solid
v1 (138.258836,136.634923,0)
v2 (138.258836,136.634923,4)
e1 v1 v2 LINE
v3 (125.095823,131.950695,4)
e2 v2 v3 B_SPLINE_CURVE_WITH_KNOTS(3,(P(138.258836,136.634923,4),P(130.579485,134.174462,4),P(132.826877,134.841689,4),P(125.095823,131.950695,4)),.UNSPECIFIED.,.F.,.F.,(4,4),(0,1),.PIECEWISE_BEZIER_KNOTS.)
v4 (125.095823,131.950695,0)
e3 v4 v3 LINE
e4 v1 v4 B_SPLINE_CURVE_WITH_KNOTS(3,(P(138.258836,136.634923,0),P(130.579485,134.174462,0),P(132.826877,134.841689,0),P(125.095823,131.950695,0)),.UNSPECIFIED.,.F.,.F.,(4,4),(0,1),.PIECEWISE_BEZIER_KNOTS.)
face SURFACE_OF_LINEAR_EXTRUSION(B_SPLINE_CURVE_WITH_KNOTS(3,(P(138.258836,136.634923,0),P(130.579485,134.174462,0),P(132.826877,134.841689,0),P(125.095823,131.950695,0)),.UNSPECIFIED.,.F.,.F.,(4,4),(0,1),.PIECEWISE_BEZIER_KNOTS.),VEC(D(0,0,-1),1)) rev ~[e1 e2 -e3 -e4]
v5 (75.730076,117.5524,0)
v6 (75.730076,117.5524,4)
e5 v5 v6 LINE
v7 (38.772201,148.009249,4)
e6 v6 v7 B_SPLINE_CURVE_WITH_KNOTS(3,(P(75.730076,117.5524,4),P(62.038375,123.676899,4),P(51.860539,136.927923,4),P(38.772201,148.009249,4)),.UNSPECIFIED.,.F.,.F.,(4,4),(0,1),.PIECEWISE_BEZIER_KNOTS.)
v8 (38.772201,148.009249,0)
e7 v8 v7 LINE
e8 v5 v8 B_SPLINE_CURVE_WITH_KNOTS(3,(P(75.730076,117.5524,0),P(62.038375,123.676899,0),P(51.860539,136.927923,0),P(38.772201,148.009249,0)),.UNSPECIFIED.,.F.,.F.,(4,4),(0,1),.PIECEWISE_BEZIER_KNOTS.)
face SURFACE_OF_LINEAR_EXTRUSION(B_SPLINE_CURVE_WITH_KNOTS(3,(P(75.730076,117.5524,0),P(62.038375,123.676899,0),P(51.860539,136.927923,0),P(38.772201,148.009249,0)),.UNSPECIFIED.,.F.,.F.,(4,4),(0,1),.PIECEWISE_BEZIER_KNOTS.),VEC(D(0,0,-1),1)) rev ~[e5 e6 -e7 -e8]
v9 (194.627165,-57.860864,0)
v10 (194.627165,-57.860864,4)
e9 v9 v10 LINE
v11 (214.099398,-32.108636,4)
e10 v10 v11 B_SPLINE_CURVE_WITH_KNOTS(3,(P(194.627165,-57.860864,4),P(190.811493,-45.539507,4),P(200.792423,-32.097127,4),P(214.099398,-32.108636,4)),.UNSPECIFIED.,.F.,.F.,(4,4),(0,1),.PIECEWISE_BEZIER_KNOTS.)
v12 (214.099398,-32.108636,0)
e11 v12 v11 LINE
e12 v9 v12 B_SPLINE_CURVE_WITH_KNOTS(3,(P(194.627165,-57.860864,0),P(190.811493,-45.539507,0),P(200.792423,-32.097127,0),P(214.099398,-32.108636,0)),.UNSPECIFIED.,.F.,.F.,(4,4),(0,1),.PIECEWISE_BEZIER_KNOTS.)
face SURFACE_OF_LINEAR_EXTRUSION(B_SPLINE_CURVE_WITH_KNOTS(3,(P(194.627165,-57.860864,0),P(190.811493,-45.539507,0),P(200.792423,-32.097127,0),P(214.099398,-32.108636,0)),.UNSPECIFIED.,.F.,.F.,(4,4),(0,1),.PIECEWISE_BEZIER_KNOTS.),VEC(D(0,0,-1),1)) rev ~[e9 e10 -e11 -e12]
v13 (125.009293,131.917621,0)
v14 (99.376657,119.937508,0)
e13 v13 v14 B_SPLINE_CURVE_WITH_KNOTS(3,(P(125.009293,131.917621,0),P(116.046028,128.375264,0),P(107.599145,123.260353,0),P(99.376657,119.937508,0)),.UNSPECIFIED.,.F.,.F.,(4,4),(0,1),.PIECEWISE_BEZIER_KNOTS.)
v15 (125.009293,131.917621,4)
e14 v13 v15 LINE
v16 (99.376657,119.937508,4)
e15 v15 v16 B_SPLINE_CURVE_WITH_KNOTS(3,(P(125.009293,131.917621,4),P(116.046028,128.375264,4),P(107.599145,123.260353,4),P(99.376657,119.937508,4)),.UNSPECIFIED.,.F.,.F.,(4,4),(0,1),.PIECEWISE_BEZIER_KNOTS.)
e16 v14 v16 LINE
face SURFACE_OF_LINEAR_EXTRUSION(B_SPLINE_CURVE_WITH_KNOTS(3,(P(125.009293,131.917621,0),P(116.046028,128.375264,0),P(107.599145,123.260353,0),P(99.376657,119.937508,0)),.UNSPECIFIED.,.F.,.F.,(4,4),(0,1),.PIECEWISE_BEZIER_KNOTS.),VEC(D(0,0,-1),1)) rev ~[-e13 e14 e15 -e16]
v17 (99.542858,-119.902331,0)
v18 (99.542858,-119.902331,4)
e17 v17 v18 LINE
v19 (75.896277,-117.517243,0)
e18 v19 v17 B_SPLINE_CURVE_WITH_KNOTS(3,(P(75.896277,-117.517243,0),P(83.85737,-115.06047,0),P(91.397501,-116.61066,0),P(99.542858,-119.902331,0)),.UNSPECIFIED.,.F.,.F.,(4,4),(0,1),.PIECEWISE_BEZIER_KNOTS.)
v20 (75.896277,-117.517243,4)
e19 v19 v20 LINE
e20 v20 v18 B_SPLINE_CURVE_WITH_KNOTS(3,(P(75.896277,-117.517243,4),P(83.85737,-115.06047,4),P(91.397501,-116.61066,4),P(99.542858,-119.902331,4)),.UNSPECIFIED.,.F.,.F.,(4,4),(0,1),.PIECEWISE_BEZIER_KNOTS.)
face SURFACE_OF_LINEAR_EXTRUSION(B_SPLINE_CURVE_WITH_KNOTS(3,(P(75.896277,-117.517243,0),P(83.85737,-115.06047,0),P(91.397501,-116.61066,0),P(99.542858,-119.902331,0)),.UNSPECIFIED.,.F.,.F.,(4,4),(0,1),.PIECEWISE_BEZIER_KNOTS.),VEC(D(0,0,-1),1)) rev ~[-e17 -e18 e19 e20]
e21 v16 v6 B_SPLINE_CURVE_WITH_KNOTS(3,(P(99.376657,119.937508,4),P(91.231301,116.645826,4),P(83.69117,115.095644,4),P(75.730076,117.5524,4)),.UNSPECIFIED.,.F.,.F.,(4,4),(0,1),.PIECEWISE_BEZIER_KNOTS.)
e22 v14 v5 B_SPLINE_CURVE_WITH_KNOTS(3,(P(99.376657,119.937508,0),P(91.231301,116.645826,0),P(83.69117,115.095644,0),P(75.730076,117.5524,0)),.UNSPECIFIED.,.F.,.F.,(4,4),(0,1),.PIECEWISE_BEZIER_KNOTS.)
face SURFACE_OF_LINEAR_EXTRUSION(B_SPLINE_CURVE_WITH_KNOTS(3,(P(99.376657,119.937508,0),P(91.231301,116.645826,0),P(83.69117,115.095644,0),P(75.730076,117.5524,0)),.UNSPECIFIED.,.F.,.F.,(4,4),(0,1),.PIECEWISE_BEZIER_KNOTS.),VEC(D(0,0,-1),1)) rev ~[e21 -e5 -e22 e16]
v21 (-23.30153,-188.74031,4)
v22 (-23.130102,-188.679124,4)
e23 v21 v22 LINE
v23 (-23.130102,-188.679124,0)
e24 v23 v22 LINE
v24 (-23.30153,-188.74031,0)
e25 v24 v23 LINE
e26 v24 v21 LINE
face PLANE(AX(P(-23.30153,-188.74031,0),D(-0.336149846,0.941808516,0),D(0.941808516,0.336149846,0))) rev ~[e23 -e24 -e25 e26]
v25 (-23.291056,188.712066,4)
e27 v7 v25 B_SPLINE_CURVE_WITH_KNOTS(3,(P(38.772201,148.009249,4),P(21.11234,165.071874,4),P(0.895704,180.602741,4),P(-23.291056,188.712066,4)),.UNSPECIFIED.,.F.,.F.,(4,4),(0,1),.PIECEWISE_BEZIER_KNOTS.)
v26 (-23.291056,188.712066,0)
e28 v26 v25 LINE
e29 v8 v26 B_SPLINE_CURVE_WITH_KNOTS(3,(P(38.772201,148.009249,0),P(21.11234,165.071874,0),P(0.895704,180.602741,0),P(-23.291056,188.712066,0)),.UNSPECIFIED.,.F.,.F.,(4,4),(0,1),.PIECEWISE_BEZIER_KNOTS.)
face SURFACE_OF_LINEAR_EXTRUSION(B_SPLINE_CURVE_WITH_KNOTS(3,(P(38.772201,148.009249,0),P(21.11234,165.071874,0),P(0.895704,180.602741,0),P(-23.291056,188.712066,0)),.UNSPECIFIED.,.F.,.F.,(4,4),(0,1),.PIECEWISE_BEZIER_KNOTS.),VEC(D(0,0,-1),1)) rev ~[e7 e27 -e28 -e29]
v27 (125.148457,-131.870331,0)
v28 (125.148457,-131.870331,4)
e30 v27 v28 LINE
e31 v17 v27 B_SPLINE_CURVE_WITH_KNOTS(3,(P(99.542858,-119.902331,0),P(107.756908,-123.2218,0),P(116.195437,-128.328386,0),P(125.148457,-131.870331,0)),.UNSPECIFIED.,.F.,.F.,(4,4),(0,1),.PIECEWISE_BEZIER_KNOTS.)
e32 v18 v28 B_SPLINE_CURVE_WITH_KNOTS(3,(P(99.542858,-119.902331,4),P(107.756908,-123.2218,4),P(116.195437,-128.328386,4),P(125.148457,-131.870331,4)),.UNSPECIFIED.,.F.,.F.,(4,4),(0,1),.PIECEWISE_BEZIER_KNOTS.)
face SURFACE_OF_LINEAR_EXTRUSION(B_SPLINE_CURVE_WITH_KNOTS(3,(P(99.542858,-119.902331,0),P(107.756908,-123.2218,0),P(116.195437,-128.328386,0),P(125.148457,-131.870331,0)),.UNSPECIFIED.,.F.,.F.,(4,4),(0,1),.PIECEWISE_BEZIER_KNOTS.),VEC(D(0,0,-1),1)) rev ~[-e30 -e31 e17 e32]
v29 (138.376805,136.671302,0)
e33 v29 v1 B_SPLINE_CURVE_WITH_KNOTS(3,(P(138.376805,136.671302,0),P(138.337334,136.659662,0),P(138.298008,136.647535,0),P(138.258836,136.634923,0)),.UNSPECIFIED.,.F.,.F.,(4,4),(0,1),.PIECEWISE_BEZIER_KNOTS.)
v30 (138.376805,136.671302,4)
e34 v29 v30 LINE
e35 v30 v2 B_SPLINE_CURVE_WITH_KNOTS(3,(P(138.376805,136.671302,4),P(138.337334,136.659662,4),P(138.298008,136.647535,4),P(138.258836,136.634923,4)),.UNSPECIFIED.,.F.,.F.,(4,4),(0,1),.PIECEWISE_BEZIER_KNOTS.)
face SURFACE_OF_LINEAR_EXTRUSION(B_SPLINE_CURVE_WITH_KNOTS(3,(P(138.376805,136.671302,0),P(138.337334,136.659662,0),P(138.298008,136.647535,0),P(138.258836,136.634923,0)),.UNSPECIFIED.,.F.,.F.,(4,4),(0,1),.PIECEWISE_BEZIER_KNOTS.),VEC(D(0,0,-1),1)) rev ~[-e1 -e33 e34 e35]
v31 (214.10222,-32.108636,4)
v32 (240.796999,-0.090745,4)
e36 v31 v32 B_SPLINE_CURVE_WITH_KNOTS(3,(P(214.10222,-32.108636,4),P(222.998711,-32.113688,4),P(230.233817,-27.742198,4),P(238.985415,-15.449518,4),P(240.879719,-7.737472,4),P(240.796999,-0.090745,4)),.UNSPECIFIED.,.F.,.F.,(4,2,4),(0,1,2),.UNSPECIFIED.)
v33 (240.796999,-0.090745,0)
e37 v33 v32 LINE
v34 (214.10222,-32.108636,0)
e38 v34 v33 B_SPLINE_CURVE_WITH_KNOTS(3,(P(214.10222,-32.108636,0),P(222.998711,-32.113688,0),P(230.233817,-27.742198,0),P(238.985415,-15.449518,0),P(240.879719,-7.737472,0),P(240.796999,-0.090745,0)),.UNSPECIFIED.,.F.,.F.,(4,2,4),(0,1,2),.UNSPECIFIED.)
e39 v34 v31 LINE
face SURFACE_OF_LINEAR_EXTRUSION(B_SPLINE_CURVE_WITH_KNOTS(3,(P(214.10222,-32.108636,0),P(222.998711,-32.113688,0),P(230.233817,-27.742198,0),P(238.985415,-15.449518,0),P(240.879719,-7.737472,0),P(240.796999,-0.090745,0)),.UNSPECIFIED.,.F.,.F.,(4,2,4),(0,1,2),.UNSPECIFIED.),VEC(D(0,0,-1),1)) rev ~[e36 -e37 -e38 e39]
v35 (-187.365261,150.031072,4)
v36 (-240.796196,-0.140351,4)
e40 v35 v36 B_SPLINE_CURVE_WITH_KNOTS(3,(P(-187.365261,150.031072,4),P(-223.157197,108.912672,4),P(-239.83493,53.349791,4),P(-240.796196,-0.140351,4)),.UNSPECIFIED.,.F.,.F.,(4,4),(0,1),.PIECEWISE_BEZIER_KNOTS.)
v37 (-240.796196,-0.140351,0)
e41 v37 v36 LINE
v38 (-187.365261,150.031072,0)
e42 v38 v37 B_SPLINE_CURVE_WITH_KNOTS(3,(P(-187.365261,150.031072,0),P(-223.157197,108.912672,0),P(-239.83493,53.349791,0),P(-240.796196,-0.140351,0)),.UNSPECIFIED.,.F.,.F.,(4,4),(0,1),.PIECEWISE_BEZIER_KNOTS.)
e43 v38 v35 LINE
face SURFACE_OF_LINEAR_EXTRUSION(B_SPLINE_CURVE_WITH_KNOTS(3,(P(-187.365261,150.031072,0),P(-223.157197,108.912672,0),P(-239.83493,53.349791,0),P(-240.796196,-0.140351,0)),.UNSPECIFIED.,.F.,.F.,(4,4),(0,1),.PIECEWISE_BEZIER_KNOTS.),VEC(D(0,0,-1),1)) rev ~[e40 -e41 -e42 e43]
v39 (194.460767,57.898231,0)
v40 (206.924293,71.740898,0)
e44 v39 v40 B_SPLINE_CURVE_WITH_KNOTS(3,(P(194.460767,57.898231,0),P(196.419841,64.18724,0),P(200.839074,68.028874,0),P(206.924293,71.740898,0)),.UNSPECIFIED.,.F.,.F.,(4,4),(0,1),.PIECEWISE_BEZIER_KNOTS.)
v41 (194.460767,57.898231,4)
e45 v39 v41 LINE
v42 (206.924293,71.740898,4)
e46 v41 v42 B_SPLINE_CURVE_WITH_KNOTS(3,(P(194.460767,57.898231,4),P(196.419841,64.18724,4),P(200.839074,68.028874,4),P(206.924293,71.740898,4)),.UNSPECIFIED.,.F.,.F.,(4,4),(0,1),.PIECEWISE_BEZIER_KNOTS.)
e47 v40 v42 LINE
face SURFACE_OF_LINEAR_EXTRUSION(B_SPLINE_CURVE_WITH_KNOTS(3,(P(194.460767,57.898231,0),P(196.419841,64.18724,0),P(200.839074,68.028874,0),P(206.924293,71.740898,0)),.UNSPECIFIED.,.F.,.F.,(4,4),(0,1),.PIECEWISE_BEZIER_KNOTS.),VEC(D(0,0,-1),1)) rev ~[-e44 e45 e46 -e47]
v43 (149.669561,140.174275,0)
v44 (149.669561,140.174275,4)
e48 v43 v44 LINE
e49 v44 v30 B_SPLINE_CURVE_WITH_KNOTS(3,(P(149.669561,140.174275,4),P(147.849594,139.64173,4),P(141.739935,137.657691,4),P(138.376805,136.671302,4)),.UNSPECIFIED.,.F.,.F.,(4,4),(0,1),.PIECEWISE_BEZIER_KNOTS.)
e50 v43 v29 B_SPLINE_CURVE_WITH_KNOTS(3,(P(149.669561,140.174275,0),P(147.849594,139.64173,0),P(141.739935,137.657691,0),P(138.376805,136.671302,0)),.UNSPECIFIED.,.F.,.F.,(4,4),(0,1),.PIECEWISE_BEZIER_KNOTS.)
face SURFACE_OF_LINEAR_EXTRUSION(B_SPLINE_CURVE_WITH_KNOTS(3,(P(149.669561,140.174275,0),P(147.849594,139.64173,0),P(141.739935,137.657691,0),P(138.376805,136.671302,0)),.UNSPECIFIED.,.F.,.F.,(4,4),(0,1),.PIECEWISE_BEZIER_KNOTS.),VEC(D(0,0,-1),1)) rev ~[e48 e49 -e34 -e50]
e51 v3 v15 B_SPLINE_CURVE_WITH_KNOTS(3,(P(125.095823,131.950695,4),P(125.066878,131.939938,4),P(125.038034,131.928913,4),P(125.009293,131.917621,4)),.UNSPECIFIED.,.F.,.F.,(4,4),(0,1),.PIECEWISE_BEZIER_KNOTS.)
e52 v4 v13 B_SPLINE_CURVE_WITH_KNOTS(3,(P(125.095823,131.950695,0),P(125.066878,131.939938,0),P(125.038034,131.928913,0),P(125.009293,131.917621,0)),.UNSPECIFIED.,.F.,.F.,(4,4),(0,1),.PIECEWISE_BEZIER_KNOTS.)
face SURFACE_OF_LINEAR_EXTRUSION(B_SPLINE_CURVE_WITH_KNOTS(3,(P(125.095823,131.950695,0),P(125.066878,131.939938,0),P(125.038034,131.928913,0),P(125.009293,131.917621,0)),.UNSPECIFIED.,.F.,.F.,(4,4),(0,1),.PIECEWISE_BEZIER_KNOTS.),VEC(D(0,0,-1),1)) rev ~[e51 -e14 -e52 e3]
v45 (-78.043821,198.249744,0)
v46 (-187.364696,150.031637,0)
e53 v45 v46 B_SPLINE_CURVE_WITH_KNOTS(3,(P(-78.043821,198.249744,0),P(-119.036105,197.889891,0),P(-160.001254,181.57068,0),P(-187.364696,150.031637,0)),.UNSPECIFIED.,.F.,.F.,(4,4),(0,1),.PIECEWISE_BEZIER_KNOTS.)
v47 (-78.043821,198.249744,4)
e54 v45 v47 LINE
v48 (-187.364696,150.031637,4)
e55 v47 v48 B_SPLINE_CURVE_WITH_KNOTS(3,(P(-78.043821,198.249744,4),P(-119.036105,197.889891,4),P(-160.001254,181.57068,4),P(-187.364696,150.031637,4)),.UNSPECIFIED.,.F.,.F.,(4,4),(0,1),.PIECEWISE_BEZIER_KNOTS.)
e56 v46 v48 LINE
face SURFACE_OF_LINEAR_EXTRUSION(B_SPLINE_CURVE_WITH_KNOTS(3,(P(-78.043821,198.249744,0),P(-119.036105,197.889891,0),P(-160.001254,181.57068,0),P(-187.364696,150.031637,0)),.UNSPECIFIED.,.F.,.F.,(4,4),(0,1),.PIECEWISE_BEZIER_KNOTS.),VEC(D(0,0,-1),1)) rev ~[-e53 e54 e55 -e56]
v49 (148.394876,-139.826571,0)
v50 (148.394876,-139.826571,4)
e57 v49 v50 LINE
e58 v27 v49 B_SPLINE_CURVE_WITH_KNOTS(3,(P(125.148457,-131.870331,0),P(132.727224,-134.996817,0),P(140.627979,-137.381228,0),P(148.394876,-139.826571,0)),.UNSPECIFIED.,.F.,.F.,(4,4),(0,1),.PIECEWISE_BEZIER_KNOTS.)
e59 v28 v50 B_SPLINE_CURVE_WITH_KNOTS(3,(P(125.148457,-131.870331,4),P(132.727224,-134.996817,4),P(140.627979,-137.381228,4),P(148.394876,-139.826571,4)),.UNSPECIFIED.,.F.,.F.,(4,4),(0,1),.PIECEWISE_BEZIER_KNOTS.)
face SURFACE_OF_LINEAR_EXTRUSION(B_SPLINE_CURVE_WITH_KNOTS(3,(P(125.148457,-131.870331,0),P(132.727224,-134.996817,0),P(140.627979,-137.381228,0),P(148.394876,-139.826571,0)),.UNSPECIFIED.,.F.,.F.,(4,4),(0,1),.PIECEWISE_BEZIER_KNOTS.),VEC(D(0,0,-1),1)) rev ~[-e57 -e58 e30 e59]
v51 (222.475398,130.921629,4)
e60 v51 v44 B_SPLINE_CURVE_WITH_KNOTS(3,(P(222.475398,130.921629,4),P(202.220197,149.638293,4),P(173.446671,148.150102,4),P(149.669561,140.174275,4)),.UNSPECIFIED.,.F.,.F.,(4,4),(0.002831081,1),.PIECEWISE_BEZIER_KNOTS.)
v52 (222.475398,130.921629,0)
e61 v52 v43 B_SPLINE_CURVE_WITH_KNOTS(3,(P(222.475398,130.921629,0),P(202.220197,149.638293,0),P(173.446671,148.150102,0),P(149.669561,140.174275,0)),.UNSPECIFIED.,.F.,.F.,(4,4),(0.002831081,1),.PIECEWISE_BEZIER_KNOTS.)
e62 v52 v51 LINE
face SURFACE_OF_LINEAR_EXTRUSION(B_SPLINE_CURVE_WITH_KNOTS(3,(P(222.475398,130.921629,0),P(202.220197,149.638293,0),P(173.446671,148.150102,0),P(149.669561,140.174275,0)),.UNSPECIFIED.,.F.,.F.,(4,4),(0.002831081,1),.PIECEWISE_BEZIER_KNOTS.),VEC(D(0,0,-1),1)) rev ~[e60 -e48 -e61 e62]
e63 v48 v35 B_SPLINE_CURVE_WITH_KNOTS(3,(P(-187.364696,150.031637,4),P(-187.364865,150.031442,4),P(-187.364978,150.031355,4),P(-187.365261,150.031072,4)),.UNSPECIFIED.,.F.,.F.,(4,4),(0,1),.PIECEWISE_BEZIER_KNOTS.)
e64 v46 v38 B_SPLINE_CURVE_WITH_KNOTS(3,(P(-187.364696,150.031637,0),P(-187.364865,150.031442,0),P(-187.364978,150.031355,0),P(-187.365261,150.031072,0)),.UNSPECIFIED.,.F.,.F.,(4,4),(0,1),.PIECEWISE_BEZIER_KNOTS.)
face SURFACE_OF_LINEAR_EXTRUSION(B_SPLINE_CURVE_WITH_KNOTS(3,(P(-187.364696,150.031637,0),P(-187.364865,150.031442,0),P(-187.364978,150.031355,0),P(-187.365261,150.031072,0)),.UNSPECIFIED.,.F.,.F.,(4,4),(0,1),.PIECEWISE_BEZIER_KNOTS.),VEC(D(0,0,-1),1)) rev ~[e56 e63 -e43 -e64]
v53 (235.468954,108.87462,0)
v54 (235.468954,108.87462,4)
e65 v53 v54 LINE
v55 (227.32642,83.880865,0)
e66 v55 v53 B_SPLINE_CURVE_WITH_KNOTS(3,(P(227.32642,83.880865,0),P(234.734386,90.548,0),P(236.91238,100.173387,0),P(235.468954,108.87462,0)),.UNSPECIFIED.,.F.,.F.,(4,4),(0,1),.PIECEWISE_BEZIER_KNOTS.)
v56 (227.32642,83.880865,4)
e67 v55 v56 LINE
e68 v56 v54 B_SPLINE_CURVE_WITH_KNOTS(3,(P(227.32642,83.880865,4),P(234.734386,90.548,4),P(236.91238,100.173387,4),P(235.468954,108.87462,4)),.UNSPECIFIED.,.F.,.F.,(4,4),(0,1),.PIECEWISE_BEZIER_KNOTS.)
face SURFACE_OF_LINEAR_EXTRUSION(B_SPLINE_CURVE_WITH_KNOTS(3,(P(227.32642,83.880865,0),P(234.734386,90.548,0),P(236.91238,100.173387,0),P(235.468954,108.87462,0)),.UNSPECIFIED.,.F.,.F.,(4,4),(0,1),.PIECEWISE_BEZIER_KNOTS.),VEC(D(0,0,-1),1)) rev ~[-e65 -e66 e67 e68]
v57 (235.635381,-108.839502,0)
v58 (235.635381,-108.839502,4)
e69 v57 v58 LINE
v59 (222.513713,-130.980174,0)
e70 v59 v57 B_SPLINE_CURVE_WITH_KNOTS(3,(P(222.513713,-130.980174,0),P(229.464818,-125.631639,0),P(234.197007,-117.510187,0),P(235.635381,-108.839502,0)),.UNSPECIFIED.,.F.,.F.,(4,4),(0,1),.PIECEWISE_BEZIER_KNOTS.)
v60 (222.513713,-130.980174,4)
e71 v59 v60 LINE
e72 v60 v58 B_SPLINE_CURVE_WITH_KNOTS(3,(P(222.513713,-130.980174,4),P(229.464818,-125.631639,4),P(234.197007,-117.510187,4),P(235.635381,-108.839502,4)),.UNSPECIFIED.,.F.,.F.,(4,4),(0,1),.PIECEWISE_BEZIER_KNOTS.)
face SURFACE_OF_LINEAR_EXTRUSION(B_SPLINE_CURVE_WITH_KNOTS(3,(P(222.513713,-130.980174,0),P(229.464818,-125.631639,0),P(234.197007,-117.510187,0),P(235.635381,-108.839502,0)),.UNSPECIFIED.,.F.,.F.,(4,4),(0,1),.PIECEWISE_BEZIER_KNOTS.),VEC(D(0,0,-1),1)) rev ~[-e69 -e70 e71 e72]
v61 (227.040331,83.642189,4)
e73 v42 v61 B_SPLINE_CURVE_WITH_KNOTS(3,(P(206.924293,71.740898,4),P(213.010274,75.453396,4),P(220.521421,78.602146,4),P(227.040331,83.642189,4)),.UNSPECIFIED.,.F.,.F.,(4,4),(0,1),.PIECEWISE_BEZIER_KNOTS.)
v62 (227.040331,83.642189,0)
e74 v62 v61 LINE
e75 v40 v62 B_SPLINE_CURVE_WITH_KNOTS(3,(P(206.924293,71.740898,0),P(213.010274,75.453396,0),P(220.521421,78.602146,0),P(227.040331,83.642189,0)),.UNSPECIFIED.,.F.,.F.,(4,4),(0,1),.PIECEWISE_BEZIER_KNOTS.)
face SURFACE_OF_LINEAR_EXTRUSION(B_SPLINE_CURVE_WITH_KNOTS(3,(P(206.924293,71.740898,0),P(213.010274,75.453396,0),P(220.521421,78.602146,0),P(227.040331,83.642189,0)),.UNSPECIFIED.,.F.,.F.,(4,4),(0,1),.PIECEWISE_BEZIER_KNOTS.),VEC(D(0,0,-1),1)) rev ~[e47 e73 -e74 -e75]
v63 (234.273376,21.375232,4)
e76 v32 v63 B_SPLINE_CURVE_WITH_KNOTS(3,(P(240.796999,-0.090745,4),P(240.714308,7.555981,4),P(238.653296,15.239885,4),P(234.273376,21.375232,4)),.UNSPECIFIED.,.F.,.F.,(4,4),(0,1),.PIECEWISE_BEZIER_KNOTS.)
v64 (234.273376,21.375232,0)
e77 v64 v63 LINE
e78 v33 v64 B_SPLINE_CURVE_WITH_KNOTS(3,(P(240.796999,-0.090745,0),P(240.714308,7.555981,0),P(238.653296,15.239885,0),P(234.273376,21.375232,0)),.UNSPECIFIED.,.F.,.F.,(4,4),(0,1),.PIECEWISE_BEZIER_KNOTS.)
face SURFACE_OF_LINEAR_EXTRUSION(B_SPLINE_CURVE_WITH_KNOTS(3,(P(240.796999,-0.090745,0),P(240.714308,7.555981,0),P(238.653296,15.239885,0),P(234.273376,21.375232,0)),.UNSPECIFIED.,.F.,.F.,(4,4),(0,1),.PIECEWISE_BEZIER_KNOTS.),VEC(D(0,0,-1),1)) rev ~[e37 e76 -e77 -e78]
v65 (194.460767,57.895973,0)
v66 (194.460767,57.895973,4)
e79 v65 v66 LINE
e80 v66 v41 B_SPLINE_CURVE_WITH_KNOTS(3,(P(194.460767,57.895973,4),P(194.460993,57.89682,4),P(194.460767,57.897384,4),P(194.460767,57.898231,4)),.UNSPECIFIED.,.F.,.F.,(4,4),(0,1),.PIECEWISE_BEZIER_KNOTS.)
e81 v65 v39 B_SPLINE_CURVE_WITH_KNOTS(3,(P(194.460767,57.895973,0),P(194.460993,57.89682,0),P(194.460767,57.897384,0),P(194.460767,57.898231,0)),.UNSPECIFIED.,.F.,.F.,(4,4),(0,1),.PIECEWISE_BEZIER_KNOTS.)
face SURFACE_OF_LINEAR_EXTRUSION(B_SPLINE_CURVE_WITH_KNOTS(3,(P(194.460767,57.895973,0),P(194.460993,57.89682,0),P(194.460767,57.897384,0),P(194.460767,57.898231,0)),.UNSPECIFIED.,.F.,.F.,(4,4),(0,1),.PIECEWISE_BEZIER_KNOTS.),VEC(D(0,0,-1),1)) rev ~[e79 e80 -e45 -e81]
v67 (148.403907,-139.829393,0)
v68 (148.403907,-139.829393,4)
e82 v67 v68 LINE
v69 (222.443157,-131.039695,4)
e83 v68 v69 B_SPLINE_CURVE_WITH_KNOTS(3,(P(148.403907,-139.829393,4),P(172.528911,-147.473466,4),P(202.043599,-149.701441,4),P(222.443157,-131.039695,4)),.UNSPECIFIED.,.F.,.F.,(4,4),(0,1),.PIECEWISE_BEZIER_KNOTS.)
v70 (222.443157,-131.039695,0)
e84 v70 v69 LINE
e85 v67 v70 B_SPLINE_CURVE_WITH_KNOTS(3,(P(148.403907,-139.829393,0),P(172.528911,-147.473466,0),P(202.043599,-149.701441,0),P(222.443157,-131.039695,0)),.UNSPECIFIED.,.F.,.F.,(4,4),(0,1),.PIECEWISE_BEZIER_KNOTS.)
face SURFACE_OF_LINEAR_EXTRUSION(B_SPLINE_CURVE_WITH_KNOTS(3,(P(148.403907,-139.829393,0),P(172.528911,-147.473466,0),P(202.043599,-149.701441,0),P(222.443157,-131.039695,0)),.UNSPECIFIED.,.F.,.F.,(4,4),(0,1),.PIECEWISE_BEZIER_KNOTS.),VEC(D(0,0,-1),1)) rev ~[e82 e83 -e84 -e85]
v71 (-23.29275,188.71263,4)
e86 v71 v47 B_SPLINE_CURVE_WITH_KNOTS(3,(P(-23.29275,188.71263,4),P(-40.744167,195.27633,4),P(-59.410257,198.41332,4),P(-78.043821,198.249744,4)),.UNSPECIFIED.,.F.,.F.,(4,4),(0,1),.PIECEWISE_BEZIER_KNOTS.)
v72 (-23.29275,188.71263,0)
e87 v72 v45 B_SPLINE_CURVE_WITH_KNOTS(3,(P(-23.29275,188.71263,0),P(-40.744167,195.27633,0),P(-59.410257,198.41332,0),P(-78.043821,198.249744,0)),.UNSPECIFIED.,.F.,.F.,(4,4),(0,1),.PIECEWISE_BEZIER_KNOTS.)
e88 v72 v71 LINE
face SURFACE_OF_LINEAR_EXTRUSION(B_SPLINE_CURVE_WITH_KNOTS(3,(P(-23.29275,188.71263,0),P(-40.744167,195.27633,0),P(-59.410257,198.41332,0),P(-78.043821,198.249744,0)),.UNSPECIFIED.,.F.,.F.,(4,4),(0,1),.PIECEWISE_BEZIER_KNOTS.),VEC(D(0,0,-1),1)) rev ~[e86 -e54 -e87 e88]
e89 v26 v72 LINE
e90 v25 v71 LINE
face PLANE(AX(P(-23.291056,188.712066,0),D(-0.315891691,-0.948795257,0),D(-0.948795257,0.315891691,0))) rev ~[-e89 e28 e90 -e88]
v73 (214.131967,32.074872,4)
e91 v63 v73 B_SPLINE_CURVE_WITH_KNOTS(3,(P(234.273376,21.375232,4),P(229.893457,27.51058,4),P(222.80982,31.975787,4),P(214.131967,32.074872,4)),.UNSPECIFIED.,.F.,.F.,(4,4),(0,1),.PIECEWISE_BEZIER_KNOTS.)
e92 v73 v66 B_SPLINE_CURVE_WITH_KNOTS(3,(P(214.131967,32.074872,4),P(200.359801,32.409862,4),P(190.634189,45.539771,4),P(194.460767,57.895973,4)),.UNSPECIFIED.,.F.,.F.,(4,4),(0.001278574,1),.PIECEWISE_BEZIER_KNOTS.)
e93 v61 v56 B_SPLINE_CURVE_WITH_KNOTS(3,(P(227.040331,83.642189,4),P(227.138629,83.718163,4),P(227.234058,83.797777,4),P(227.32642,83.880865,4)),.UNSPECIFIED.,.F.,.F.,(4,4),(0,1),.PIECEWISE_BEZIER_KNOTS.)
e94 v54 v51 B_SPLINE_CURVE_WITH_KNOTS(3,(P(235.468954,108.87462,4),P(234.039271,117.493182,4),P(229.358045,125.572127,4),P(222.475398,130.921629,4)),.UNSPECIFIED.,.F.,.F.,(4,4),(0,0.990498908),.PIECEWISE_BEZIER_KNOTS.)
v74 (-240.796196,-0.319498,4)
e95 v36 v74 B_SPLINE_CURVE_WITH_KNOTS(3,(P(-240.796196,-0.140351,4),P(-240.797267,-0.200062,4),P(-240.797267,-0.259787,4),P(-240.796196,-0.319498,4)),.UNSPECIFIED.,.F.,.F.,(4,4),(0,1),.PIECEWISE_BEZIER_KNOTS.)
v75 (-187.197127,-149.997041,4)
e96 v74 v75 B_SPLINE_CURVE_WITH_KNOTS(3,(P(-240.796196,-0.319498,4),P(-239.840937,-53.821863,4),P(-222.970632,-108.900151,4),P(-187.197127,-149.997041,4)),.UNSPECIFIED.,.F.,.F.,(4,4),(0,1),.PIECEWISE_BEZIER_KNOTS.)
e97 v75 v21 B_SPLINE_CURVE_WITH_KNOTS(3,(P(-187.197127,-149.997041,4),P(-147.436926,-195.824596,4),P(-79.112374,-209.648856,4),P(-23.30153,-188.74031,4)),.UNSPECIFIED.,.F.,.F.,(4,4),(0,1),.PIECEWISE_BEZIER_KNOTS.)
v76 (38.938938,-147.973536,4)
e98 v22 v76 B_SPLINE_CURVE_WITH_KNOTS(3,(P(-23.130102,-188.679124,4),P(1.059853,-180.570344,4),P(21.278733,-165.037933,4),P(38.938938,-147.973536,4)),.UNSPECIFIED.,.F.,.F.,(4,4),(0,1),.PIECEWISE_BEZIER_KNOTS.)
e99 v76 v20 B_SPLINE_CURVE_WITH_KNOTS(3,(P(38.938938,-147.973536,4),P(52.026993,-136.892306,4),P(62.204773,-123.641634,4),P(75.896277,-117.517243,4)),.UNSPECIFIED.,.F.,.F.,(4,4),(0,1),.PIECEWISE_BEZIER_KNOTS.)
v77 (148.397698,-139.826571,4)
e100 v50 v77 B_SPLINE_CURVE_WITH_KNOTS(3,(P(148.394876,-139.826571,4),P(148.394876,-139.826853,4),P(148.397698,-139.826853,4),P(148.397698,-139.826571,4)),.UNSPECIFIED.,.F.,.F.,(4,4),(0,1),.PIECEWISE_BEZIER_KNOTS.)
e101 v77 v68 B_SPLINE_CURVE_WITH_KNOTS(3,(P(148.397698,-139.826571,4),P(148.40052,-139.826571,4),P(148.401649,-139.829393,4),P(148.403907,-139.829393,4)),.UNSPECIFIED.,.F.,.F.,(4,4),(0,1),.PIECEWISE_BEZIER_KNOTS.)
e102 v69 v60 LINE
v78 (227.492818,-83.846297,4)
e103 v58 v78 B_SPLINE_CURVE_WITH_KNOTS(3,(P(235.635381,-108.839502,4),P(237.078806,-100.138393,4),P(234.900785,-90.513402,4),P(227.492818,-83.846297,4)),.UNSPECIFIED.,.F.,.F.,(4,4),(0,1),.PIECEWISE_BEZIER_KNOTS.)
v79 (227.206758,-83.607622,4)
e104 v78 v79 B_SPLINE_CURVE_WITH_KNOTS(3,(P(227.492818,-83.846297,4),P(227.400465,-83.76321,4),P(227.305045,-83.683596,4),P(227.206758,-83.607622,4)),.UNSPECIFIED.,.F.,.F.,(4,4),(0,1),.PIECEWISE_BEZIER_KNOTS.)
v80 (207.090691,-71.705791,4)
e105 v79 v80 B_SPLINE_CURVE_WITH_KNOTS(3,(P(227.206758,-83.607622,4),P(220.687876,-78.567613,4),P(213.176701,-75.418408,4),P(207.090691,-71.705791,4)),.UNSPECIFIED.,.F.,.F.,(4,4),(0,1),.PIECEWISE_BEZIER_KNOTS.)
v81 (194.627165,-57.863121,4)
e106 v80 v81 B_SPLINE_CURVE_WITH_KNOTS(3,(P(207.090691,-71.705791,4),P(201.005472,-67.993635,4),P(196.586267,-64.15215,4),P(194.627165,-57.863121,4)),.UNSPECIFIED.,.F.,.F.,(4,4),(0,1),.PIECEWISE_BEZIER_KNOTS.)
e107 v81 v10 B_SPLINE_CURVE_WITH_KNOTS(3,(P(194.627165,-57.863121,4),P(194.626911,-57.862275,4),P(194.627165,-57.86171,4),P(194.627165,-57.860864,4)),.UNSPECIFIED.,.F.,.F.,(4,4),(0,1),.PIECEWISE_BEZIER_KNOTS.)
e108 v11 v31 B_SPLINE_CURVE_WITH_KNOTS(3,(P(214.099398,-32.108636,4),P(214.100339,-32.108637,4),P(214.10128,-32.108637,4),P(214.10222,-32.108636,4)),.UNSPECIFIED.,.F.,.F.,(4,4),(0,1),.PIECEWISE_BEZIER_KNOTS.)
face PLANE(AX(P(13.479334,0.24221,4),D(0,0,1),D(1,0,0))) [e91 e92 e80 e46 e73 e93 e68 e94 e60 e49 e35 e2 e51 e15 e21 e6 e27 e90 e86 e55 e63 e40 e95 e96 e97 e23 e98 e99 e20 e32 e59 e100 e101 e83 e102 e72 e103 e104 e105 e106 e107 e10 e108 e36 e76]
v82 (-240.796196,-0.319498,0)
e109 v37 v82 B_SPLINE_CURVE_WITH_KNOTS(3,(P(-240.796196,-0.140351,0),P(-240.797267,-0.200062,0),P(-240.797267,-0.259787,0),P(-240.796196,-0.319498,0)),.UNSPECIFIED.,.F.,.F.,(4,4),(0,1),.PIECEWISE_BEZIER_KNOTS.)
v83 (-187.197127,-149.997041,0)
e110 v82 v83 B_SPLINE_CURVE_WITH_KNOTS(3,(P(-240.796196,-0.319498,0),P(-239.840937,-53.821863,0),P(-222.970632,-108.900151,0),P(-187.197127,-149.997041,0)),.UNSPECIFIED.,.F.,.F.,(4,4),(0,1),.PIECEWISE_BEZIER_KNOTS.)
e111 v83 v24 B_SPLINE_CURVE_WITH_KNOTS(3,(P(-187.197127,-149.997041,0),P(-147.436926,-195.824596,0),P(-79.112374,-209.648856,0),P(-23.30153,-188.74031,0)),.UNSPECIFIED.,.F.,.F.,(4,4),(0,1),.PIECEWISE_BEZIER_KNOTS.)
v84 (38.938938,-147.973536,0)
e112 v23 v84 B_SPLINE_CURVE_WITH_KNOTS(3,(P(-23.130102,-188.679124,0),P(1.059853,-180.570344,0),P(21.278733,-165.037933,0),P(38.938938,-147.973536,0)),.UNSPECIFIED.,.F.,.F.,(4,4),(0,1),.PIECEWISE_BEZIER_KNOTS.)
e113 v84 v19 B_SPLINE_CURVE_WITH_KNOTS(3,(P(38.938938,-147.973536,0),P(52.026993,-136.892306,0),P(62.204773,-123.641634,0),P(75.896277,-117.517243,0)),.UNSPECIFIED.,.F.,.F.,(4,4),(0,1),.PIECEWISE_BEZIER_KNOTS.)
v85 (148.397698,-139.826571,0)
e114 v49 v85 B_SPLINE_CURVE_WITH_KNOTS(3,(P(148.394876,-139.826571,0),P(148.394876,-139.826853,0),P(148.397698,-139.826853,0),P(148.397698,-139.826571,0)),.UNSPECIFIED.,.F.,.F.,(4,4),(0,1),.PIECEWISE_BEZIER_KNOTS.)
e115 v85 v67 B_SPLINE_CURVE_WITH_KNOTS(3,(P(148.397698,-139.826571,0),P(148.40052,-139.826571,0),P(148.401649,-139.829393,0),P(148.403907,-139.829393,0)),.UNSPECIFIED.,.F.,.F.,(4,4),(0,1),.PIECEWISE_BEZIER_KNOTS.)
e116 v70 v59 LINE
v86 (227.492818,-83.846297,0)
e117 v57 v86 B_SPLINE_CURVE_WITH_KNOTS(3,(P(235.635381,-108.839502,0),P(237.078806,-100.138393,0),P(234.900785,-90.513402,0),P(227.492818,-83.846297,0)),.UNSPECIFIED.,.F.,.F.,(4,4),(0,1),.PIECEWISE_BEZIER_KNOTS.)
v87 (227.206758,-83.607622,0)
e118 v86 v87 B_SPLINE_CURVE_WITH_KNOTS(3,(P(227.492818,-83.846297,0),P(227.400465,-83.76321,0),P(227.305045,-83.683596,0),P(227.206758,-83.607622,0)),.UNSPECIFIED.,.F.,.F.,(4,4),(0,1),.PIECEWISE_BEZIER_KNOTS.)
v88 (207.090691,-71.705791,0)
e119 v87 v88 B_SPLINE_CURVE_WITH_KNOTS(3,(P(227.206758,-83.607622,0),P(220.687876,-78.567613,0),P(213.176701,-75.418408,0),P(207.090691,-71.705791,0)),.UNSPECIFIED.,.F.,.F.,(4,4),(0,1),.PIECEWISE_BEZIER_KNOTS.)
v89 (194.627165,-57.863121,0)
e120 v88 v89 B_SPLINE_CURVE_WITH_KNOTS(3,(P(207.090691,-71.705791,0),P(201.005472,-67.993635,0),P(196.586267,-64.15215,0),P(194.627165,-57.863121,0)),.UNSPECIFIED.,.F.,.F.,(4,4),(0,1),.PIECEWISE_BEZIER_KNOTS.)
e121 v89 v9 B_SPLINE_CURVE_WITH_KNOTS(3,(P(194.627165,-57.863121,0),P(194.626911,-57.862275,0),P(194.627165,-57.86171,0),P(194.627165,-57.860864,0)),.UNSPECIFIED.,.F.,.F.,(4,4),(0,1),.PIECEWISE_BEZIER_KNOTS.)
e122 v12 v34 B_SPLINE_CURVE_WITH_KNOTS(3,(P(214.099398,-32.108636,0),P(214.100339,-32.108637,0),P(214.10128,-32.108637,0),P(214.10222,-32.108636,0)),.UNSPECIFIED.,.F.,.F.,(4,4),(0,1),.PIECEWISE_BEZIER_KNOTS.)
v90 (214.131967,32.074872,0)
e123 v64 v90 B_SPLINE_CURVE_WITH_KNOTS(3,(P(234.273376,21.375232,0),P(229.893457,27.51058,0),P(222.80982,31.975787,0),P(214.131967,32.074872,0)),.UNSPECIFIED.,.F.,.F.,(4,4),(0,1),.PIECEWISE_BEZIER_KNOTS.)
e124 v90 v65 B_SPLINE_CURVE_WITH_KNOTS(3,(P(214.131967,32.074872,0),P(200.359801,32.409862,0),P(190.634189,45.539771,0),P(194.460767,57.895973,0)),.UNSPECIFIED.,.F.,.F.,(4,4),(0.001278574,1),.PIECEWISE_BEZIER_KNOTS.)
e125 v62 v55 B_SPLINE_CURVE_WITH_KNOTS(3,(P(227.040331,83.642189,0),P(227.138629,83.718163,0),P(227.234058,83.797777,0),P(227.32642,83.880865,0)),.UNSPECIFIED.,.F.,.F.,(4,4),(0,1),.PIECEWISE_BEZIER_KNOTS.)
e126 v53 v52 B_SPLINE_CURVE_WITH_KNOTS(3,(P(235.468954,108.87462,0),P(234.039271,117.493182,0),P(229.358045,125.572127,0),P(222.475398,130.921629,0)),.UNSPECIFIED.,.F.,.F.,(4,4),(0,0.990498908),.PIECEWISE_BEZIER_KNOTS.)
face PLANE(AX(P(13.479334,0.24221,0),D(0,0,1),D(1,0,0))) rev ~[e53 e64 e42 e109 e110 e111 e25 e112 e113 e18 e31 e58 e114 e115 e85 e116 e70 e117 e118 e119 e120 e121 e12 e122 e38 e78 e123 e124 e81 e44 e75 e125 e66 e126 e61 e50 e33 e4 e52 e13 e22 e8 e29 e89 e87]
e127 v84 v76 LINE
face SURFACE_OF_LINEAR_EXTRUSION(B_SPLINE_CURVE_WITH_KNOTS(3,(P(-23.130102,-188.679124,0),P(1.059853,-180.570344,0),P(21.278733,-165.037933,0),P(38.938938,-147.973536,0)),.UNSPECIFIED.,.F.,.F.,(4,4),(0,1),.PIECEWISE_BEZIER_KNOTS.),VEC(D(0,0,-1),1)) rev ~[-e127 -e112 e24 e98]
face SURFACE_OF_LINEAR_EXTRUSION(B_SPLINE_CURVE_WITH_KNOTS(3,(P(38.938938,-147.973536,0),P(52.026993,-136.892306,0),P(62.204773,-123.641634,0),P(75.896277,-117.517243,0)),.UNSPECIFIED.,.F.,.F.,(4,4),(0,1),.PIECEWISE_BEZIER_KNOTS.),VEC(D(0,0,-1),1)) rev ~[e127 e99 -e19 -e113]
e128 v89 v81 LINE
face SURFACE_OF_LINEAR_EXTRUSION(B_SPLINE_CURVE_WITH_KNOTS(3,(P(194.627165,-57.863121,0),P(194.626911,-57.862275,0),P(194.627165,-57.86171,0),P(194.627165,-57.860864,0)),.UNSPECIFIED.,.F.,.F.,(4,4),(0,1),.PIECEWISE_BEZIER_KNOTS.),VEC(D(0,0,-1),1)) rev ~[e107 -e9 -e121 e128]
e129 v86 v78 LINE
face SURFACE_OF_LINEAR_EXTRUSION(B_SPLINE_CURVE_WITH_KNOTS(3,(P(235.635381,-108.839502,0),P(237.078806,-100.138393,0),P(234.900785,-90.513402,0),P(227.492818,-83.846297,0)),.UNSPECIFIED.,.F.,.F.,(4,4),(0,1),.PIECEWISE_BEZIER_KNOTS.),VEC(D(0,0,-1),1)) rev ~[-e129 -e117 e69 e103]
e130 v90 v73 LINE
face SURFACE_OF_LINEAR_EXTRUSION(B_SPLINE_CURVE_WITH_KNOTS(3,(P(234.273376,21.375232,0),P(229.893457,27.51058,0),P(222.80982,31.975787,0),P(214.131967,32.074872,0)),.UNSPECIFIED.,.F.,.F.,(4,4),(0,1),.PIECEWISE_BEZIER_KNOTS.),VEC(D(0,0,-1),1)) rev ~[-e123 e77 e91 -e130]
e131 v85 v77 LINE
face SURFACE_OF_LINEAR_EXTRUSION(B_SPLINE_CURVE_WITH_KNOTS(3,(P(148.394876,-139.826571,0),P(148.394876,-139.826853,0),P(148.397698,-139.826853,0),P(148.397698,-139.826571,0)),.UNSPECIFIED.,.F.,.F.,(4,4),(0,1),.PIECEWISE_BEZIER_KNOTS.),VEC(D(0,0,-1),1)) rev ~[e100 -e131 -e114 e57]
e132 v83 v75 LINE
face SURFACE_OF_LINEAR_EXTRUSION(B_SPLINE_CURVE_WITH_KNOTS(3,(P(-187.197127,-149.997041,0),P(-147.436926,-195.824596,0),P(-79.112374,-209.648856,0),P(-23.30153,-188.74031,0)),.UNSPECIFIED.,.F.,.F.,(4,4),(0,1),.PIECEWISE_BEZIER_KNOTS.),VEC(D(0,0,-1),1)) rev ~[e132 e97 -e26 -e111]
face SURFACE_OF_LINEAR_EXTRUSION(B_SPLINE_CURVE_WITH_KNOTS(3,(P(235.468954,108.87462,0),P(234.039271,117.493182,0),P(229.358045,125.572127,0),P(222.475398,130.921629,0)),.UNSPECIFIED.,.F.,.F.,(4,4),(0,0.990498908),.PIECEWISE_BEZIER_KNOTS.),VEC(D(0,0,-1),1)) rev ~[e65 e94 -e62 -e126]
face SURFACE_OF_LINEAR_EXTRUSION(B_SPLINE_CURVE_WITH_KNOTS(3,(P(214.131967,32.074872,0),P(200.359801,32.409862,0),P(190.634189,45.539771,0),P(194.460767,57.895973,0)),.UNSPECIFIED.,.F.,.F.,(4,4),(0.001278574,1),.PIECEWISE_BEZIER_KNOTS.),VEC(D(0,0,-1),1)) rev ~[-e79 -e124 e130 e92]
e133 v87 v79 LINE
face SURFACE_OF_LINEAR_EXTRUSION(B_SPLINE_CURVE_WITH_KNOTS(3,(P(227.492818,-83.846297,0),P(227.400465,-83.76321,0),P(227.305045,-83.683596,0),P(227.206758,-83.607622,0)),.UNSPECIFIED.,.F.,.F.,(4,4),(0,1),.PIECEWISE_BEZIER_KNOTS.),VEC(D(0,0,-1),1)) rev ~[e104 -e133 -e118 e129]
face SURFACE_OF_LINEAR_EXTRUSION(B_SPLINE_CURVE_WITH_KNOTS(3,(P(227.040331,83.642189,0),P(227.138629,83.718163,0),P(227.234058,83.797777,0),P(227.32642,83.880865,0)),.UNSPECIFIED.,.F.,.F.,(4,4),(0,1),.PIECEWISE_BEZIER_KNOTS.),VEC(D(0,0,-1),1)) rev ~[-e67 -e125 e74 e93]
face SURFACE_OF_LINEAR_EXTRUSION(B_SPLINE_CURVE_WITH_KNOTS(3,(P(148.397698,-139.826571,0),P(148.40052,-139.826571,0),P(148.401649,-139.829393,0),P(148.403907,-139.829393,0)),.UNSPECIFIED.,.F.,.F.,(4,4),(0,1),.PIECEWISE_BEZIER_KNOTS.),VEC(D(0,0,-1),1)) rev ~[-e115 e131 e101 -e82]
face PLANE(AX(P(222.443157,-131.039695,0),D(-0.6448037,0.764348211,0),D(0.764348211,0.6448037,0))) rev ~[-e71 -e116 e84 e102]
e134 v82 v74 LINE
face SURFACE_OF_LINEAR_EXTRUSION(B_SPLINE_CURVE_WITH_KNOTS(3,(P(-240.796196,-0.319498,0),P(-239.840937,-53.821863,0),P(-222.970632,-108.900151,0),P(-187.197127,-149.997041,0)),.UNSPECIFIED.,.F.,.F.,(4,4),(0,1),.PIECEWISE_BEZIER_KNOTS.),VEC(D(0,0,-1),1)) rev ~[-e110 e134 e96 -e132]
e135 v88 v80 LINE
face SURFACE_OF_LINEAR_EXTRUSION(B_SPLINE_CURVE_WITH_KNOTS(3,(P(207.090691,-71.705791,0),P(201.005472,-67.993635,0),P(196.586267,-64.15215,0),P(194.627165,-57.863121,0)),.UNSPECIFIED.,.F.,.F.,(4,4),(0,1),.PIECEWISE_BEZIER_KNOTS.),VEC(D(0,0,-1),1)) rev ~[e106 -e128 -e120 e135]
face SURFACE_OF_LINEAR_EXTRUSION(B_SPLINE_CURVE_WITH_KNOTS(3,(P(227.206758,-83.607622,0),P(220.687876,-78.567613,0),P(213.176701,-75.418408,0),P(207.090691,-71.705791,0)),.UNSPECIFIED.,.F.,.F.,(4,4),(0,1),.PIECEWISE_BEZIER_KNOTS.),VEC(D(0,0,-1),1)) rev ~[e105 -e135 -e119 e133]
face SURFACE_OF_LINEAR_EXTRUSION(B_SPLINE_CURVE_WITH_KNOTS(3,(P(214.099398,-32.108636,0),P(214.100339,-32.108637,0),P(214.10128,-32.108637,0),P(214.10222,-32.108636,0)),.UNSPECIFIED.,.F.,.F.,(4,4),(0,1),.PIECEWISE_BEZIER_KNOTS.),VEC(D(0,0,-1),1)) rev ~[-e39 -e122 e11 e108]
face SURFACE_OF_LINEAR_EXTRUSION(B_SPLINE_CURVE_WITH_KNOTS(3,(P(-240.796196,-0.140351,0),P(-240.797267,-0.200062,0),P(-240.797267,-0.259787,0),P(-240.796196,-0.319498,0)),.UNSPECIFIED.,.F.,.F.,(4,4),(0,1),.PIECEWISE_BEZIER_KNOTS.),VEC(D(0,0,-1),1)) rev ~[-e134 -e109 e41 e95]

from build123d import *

# Parameters (mm, degrees)
F1_DEPTH = 4


# Not quite as in the source:
# - ends of sketch curves that miss each other by under 0.0002 mm in the source are joined


with BuildPart() as f1:
    # F0 (on Top) → F1 (new body)
    with BuildSketch(Plane.XY):
        with BuildLine():
            add(Edge.make_bspline(
                [(-23.29275, 188.71263), (-40.744167, 195.27633), (-59.410257, 198.41332), (-78.043821, 198.249744)],
                knots=[0, 0, 0, 0, 1, 1, 1, 1], degree=3))
            add(Edge.make_bspline(
                [(-78.043821, 198.249744), (-119.036105, 197.889891), (-160.001254, 181.57068), (-187.364696, 150.031637)],
                knots=[0, 0, 0, 0, 1, 1, 1, 1], degree=3))
            add(Edge.make_bspline(
                [(-187.364696, 150.031637), (-187.364865, 150.031442), (-187.364978, 150.031355), (-187.365261, 150.031072)],
                knots=[0, 0, 0, 0, 1, 1, 1, 1], degree=3))
            add(Edge.make_bspline(
                [(-187.365261, 150.031072), (-223.157197, 108.912672), (-239.83493, 53.349791), (-240.796196, -0.140351)],
                knots=[0, 0, 0, 0, 1, 1, 1, 1], degree=3))
            add(Edge.make_bspline(
                [(-240.796196, -0.140351), (-240.797267, -0.200062), (-240.797267, -0.259787), (-240.796196, -0.319498)],
                knots=[0, 0, 0, 0, 1, 1, 1, 1], degree=3))
            add(Edge.make_bspline(
                [(-240.796196, -0.319498), (-239.840937, -53.821863), (-222.970632, -108.900151), (-187.197127, -149.997041)],
                knots=[0, 0, 0, 0, 1, 1, 1, 1], degree=3))
            add(Edge.make_bspline(
                [(-187.197127, -149.997041), (-147.436926, -195.824596), (-79.112374, -209.648856), (-23.30153, -188.74031)],
                knots=[0, 0, 0, 0, 1, 1, 1, 1], degree=3))
            Line((-23.30153, -188.74031), (-23.130102, -188.679124))
            add(Edge.make_bspline(
                [(-23.130102, -188.679124), (1.059853, -180.570344), (21.278733, -165.037933), (38.938938, -147.973536)],
                knots=[0, 0, 0, 0, 1, 1, 1, 1], degree=3))
            add(Edge.make_bspline(
                [(38.938938, -147.973536), (52.026993, -136.892306), (62.204773, -123.641634), (75.896277, -117.517243)],
                knots=[0, 0, 0, 0, 1, 1, 1, 1], degree=3))
            add(Edge.make_bspline(
                [(75.896277, -117.517243), (83.85737, -115.06047), (91.397501, -116.61066), (99.542858, -119.902331)],
                knots=[0, 0, 0, 0, 1, 1, 1, 1], degree=3))
            add(Edge.make_bspline(
                [(99.542858, -119.902331), (107.756908, -123.2218), (116.195437, -128.328386), (125.148457, -131.870331)],
                knots=[0, 0, 0, 0, 1, 1, 1, 1], degree=3))
            add(Edge.make_bspline(
                [(125.148457, -131.870331), (132.727224, -134.996817), (140.627979, -137.381228), (148.394876, -139.826571)],
                knots=[0, 0, 0, 0, 1, 1, 1, 1], degree=3))
            add(Edge.make_bspline(
                [(148.394876, -139.826571), (148.394876, -139.826853), (148.397698, -139.826853), (148.397698, -139.826571)],
                knots=[0, 0, 0, 0, 1, 1, 1, 1], degree=3))
            add(Edge.make_bspline(
                [(148.397698, -139.826571), (148.40052, -139.826571), (148.401649, -139.829393), (148.403907, -139.829393)],
                knots=[0, 0, 0, 0, 1, 1, 1, 1], degree=3))
            add(Edge.make_bspline(
                [(148.403907, -139.829393), (172.528911, -147.473466), (202.043599, -149.701441), (222.443157, -131.039695)],
                knots=[0, 0, 0, 0, 1, 1, 1, 1], degree=3))
            Line((222.443157, -131.039695), (222.513713, -130.980174))
            add(Edge.make_bspline(
                [(222.513713, -130.980174), (229.464818, -125.631639), (234.197007, -117.510187), (235.635381, -108.839502)],
                knots=[0, 0, 0, 0, 1, 1, 1, 1], degree=3))
            add(Edge.make_bspline(
                [(235.635381, -108.839502), (237.078806, -100.138393), (234.900785, -90.513402), (227.492818, -83.846297)],
                knots=[0, 0, 0, 0, 1, 1, 1, 1], degree=3))
            add(Edge.make_bspline(
                [(227.492818, -83.846297), (227.400465, -83.76321), (227.305045, -83.683596), (227.206758, -83.607622)],
                knots=[0, 0, 0, 0, 1, 1, 1, 1], degree=3))
            add(Edge.make_bspline(
                [(227.206758, -83.607622), (220.687876, -78.567613), (213.176701, -75.418408), (207.090691, -71.705791)],
                knots=[0, 0, 0, 0, 1, 1, 1, 1], degree=3))
            add(Edge.make_bspline(
                [(207.090691, -71.705791), (201.005472, -67.993635), (196.586267, -64.15215), (194.627165, -57.863121)],
                knots=[0, 0, 0, 0, 1, 1, 1, 1], degree=3))
            add(Edge.make_bspline(
                [(194.627165, -57.863121), (194.626911, -57.862275), (194.627165, -57.86171), (194.627165, -57.860864)],
                knots=[0, 0, 0, 0, 1, 1, 1, 1], degree=3))
            add(Edge.make_bspline(
                [(194.627165, -57.860864), (190.811493, -45.539507), (200.792423, -32.097127), (214.099398, -32.108636)],
                knots=[0, 0, 0, 0, 1, 1, 1, 1], degree=3))
            add(Edge.make_bspline(
                [(214.099398, -32.108636), (214.100339, -32.108637), (214.10128, -32.108637), (214.10222, -32.108636)],
                knots=[0, 0, 0, 0, 1, 1, 1, 1], degree=3))
            add(Edge.make_bspline(
                [(214.10222, -32.108636), (222.998711, -32.113688), (230.233817, -27.742198), (234.609616, -21.595858)],
                knots=[0, 0, 0, 0, 1, 1, 1, 1], degree=3))
            add(Edge.make_bspline(
                [(234.609616, -21.595858), (238.985415, -15.449518), (240.879719, -7.737472), (240.796999, -0.090745)],
                knots=[0, 0, 0, 0, 1, 1, 1, 1], degree=3))
            add(Edge.make_bspline(
                [(240.796999, -0.090745), (240.714308, 7.555981), (238.653296, 15.239885), (234.273376, 21.375232)],
                knots=[0, 0, 0, 0, 1, 1, 1, 1], degree=3))
            add(Edge.make_bspline(
                [(234.273376, 21.375232), (229.893457, 27.51058), (222.80982, 31.975787), (214.131967, 32.074872)],
                knots=[0, 0, 0, 0, 1, 1, 1, 1], degree=3))
            add(Edge.make_bspline(
                [(214.131967, 32.074872), (200.3598011228, 32.409862366), (190.6341888263, 45.5397705426), (194.460767, 57.895973)],
                knots=[0.0012785739, 0.0012785739, 0.0012785739, 0.0012785739, 1, 1, 1, 1], degree=3))
            add(Edge.make_bspline(
                [(194.460767, 57.895973), (194.460993, 57.89682), (194.460767, 57.897384), (194.460767, 57.898231)],
                knots=[0, 0, 0, 0, 1, 1, 1, 1], degree=3))
            add(Edge.make_bspline(
                [(194.460767, 57.898231), (196.419841, 64.18724), (200.839074, 68.028874), (206.924293, 71.740898)],
                knots=[0, 0, 0, 0, 1, 1, 1, 1], degree=3))
            add(Edge.make_bspline(
                [(206.924293, 71.740898), (213.010274, 75.453396), (220.521421, 78.602146), (227.040331, 83.642189)],
                knots=[0, 0, 0, 0, 1, 1, 1, 1], degree=3))
            add(Edge.make_bspline(
                [(227.040331, 83.642189), (227.138629, 83.718163), (227.234058, 83.797777), (227.32642, 83.880865)],
                knots=[0, 0, 0, 0, 1, 1, 1, 1], degree=3))
            add(Edge.make_bspline(
                [(227.32642, 83.880865), (234.734386, 90.548), (236.91238, 100.173387), (235.468954, 108.87462)],
                knots=[0, 0, 0, 0, 1, 1, 1, 1], degree=3))
            add(Edge.make_bspline(
                [(235.468954, 108.87462), (234.0392708475, 117.493181786), (229.358044954, 125.5721274646), (222.4753975178, 130.9216294129)],
                knots=[0, 0, 0, 0, 0.9904989081, 0.9904989081, 0.9904989081, 0.9904989081], degree=3))
            add(Edge.make_bspline(
                [(222.4753975178, 130.9216294129), (202.2201967941, 149.6382929896), (173.4466709537, 148.1501016784), (149.669561, 140.174275)],
                knots=[0.0028310813, 0.0028310813, 0.0028310813, 0.0028310813, 1, 1, 1, 1], degree=3))
            add(Edge.make_bspline(
                [(149.669561, 140.174275), (147.849594, 139.64173), (141.739935, 137.657691), (138.376805, 136.671302)],
                knots=[0, 0, 0, 0, 1, 1, 1, 1], degree=3))
            add(Edge.make_bspline(
                [(138.376805, 136.671302), (138.337334, 136.659662), (138.298008, 136.647535), (138.258836, 136.634923)],
                knots=[0, 0, 0, 0, 1, 1, 1, 1], degree=3))
            add(Edge.make_bspline(
                [(138.258836, 136.634923), (130.579485, 134.174462), (132.826877, 134.841689), (125.095823, 131.950695)],
                knots=[0, 0, 0, 0, 1, 1, 1, 1], degree=3))
            add(Edge.make_bspline(
                [(125.095823, 131.950695), (125.066878, 131.939938), (125.038034, 131.928913), (125.009293, 131.917621)],
                knots=[0, 0, 0, 0, 1, 1, 1, 1], degree=3))
            add(Edge.make_bspline(
                [(125.009293, 131.917621), (116.046028, 128.375264), (107.599145, 123.260353), (99.376657, 119.937508)],
                knots=[0, 0, 0, 0, 1, 1, 1, 1], degree=3))
            add(Edge.make_bspline(
                [(99.376657, 119.937508), (91.231301, 116.645826), (83.69117, 115.095644), (75.730076, 117.5524)],
                knots=[0, 0, 0, 0, 1, 1, 1, 1], degree=3))
            add(Edge.make_bspline(
                [(75.730076, 117.5524), (62.038375, 123.676899), (51.860539, 136.927923), (38.772201, 148.009249)],
                knots=[0, 0, 0, 0, 1, 1, 1, 1], degree=3))
            add(Edge.make_bspline(
                [(38.772201, 148.009249), (21.11234, 165.071874), (0.895704, 180.602741), (-23.291056, 188.712066)],
                knots=[0, 0, 0, 0, 1, 1, 1, 1], degree=3))
            Line((-23.291056, 188.712066), (-23.29275, 188.71263))
        make_face()
        with BuildLine():
            add(Edge.make_bspline(
                [(222.4753975178, 130.9216294129), (222.4093775909, 130.9729430579), (222.3431551094, 131.0240055645), (222.276731, 131.074815)],
                knots=[0.9904989081, 0.9904989081, 0.9904989081, 0.9904989081, 1, 1, 1, 1], degree=3))
            add(Edge.make_bspline(
                [(222.647712, 130.761724), (222.5903427082, 130.8151888768), (222.5329044444, 130.8684905764), (222.4753975178, 130.9216294129)],
                knots=[0, 0, 0, 0, 0.0028310813, 0.0028310813, 0.0028310813, 0.0028310813], degree=3))
            Line((222.647712, 130.761724), (222.276731, 131.074815))
        make_face(mode=Mode.SUBTRACT)
        with BuildLine():
            add(Edge.make_bspline(
                [(222.647712, 130.761724), (222.5903427082, 130.8151888768), (222.5329044444, 130.8684905764), (222.4753975178, 130.9216294129)],
                knots=[0, 0, 0, 0, 0.0028310813, 0.0028310813, 0.0028310813, 0.0028310813], degree=3))
            add(Edge.make_bspline(
                [(222.4753975178, 130.9216294129), (222.4093775909, 130.9729430579), (222.3431551094, 131.0240055645), (222.276731, 131.074815)],
                knots=[0.9904989081, 0.9904989081, 0.9904989081, 0.9904989081, 1, 1, 1, 1], degree=3))
            Line((222.276731, 131.074815), (222.647712, 130.761724))
        make_face()
    extrude(amount=F1_DEPTH)


solid = f1.part
